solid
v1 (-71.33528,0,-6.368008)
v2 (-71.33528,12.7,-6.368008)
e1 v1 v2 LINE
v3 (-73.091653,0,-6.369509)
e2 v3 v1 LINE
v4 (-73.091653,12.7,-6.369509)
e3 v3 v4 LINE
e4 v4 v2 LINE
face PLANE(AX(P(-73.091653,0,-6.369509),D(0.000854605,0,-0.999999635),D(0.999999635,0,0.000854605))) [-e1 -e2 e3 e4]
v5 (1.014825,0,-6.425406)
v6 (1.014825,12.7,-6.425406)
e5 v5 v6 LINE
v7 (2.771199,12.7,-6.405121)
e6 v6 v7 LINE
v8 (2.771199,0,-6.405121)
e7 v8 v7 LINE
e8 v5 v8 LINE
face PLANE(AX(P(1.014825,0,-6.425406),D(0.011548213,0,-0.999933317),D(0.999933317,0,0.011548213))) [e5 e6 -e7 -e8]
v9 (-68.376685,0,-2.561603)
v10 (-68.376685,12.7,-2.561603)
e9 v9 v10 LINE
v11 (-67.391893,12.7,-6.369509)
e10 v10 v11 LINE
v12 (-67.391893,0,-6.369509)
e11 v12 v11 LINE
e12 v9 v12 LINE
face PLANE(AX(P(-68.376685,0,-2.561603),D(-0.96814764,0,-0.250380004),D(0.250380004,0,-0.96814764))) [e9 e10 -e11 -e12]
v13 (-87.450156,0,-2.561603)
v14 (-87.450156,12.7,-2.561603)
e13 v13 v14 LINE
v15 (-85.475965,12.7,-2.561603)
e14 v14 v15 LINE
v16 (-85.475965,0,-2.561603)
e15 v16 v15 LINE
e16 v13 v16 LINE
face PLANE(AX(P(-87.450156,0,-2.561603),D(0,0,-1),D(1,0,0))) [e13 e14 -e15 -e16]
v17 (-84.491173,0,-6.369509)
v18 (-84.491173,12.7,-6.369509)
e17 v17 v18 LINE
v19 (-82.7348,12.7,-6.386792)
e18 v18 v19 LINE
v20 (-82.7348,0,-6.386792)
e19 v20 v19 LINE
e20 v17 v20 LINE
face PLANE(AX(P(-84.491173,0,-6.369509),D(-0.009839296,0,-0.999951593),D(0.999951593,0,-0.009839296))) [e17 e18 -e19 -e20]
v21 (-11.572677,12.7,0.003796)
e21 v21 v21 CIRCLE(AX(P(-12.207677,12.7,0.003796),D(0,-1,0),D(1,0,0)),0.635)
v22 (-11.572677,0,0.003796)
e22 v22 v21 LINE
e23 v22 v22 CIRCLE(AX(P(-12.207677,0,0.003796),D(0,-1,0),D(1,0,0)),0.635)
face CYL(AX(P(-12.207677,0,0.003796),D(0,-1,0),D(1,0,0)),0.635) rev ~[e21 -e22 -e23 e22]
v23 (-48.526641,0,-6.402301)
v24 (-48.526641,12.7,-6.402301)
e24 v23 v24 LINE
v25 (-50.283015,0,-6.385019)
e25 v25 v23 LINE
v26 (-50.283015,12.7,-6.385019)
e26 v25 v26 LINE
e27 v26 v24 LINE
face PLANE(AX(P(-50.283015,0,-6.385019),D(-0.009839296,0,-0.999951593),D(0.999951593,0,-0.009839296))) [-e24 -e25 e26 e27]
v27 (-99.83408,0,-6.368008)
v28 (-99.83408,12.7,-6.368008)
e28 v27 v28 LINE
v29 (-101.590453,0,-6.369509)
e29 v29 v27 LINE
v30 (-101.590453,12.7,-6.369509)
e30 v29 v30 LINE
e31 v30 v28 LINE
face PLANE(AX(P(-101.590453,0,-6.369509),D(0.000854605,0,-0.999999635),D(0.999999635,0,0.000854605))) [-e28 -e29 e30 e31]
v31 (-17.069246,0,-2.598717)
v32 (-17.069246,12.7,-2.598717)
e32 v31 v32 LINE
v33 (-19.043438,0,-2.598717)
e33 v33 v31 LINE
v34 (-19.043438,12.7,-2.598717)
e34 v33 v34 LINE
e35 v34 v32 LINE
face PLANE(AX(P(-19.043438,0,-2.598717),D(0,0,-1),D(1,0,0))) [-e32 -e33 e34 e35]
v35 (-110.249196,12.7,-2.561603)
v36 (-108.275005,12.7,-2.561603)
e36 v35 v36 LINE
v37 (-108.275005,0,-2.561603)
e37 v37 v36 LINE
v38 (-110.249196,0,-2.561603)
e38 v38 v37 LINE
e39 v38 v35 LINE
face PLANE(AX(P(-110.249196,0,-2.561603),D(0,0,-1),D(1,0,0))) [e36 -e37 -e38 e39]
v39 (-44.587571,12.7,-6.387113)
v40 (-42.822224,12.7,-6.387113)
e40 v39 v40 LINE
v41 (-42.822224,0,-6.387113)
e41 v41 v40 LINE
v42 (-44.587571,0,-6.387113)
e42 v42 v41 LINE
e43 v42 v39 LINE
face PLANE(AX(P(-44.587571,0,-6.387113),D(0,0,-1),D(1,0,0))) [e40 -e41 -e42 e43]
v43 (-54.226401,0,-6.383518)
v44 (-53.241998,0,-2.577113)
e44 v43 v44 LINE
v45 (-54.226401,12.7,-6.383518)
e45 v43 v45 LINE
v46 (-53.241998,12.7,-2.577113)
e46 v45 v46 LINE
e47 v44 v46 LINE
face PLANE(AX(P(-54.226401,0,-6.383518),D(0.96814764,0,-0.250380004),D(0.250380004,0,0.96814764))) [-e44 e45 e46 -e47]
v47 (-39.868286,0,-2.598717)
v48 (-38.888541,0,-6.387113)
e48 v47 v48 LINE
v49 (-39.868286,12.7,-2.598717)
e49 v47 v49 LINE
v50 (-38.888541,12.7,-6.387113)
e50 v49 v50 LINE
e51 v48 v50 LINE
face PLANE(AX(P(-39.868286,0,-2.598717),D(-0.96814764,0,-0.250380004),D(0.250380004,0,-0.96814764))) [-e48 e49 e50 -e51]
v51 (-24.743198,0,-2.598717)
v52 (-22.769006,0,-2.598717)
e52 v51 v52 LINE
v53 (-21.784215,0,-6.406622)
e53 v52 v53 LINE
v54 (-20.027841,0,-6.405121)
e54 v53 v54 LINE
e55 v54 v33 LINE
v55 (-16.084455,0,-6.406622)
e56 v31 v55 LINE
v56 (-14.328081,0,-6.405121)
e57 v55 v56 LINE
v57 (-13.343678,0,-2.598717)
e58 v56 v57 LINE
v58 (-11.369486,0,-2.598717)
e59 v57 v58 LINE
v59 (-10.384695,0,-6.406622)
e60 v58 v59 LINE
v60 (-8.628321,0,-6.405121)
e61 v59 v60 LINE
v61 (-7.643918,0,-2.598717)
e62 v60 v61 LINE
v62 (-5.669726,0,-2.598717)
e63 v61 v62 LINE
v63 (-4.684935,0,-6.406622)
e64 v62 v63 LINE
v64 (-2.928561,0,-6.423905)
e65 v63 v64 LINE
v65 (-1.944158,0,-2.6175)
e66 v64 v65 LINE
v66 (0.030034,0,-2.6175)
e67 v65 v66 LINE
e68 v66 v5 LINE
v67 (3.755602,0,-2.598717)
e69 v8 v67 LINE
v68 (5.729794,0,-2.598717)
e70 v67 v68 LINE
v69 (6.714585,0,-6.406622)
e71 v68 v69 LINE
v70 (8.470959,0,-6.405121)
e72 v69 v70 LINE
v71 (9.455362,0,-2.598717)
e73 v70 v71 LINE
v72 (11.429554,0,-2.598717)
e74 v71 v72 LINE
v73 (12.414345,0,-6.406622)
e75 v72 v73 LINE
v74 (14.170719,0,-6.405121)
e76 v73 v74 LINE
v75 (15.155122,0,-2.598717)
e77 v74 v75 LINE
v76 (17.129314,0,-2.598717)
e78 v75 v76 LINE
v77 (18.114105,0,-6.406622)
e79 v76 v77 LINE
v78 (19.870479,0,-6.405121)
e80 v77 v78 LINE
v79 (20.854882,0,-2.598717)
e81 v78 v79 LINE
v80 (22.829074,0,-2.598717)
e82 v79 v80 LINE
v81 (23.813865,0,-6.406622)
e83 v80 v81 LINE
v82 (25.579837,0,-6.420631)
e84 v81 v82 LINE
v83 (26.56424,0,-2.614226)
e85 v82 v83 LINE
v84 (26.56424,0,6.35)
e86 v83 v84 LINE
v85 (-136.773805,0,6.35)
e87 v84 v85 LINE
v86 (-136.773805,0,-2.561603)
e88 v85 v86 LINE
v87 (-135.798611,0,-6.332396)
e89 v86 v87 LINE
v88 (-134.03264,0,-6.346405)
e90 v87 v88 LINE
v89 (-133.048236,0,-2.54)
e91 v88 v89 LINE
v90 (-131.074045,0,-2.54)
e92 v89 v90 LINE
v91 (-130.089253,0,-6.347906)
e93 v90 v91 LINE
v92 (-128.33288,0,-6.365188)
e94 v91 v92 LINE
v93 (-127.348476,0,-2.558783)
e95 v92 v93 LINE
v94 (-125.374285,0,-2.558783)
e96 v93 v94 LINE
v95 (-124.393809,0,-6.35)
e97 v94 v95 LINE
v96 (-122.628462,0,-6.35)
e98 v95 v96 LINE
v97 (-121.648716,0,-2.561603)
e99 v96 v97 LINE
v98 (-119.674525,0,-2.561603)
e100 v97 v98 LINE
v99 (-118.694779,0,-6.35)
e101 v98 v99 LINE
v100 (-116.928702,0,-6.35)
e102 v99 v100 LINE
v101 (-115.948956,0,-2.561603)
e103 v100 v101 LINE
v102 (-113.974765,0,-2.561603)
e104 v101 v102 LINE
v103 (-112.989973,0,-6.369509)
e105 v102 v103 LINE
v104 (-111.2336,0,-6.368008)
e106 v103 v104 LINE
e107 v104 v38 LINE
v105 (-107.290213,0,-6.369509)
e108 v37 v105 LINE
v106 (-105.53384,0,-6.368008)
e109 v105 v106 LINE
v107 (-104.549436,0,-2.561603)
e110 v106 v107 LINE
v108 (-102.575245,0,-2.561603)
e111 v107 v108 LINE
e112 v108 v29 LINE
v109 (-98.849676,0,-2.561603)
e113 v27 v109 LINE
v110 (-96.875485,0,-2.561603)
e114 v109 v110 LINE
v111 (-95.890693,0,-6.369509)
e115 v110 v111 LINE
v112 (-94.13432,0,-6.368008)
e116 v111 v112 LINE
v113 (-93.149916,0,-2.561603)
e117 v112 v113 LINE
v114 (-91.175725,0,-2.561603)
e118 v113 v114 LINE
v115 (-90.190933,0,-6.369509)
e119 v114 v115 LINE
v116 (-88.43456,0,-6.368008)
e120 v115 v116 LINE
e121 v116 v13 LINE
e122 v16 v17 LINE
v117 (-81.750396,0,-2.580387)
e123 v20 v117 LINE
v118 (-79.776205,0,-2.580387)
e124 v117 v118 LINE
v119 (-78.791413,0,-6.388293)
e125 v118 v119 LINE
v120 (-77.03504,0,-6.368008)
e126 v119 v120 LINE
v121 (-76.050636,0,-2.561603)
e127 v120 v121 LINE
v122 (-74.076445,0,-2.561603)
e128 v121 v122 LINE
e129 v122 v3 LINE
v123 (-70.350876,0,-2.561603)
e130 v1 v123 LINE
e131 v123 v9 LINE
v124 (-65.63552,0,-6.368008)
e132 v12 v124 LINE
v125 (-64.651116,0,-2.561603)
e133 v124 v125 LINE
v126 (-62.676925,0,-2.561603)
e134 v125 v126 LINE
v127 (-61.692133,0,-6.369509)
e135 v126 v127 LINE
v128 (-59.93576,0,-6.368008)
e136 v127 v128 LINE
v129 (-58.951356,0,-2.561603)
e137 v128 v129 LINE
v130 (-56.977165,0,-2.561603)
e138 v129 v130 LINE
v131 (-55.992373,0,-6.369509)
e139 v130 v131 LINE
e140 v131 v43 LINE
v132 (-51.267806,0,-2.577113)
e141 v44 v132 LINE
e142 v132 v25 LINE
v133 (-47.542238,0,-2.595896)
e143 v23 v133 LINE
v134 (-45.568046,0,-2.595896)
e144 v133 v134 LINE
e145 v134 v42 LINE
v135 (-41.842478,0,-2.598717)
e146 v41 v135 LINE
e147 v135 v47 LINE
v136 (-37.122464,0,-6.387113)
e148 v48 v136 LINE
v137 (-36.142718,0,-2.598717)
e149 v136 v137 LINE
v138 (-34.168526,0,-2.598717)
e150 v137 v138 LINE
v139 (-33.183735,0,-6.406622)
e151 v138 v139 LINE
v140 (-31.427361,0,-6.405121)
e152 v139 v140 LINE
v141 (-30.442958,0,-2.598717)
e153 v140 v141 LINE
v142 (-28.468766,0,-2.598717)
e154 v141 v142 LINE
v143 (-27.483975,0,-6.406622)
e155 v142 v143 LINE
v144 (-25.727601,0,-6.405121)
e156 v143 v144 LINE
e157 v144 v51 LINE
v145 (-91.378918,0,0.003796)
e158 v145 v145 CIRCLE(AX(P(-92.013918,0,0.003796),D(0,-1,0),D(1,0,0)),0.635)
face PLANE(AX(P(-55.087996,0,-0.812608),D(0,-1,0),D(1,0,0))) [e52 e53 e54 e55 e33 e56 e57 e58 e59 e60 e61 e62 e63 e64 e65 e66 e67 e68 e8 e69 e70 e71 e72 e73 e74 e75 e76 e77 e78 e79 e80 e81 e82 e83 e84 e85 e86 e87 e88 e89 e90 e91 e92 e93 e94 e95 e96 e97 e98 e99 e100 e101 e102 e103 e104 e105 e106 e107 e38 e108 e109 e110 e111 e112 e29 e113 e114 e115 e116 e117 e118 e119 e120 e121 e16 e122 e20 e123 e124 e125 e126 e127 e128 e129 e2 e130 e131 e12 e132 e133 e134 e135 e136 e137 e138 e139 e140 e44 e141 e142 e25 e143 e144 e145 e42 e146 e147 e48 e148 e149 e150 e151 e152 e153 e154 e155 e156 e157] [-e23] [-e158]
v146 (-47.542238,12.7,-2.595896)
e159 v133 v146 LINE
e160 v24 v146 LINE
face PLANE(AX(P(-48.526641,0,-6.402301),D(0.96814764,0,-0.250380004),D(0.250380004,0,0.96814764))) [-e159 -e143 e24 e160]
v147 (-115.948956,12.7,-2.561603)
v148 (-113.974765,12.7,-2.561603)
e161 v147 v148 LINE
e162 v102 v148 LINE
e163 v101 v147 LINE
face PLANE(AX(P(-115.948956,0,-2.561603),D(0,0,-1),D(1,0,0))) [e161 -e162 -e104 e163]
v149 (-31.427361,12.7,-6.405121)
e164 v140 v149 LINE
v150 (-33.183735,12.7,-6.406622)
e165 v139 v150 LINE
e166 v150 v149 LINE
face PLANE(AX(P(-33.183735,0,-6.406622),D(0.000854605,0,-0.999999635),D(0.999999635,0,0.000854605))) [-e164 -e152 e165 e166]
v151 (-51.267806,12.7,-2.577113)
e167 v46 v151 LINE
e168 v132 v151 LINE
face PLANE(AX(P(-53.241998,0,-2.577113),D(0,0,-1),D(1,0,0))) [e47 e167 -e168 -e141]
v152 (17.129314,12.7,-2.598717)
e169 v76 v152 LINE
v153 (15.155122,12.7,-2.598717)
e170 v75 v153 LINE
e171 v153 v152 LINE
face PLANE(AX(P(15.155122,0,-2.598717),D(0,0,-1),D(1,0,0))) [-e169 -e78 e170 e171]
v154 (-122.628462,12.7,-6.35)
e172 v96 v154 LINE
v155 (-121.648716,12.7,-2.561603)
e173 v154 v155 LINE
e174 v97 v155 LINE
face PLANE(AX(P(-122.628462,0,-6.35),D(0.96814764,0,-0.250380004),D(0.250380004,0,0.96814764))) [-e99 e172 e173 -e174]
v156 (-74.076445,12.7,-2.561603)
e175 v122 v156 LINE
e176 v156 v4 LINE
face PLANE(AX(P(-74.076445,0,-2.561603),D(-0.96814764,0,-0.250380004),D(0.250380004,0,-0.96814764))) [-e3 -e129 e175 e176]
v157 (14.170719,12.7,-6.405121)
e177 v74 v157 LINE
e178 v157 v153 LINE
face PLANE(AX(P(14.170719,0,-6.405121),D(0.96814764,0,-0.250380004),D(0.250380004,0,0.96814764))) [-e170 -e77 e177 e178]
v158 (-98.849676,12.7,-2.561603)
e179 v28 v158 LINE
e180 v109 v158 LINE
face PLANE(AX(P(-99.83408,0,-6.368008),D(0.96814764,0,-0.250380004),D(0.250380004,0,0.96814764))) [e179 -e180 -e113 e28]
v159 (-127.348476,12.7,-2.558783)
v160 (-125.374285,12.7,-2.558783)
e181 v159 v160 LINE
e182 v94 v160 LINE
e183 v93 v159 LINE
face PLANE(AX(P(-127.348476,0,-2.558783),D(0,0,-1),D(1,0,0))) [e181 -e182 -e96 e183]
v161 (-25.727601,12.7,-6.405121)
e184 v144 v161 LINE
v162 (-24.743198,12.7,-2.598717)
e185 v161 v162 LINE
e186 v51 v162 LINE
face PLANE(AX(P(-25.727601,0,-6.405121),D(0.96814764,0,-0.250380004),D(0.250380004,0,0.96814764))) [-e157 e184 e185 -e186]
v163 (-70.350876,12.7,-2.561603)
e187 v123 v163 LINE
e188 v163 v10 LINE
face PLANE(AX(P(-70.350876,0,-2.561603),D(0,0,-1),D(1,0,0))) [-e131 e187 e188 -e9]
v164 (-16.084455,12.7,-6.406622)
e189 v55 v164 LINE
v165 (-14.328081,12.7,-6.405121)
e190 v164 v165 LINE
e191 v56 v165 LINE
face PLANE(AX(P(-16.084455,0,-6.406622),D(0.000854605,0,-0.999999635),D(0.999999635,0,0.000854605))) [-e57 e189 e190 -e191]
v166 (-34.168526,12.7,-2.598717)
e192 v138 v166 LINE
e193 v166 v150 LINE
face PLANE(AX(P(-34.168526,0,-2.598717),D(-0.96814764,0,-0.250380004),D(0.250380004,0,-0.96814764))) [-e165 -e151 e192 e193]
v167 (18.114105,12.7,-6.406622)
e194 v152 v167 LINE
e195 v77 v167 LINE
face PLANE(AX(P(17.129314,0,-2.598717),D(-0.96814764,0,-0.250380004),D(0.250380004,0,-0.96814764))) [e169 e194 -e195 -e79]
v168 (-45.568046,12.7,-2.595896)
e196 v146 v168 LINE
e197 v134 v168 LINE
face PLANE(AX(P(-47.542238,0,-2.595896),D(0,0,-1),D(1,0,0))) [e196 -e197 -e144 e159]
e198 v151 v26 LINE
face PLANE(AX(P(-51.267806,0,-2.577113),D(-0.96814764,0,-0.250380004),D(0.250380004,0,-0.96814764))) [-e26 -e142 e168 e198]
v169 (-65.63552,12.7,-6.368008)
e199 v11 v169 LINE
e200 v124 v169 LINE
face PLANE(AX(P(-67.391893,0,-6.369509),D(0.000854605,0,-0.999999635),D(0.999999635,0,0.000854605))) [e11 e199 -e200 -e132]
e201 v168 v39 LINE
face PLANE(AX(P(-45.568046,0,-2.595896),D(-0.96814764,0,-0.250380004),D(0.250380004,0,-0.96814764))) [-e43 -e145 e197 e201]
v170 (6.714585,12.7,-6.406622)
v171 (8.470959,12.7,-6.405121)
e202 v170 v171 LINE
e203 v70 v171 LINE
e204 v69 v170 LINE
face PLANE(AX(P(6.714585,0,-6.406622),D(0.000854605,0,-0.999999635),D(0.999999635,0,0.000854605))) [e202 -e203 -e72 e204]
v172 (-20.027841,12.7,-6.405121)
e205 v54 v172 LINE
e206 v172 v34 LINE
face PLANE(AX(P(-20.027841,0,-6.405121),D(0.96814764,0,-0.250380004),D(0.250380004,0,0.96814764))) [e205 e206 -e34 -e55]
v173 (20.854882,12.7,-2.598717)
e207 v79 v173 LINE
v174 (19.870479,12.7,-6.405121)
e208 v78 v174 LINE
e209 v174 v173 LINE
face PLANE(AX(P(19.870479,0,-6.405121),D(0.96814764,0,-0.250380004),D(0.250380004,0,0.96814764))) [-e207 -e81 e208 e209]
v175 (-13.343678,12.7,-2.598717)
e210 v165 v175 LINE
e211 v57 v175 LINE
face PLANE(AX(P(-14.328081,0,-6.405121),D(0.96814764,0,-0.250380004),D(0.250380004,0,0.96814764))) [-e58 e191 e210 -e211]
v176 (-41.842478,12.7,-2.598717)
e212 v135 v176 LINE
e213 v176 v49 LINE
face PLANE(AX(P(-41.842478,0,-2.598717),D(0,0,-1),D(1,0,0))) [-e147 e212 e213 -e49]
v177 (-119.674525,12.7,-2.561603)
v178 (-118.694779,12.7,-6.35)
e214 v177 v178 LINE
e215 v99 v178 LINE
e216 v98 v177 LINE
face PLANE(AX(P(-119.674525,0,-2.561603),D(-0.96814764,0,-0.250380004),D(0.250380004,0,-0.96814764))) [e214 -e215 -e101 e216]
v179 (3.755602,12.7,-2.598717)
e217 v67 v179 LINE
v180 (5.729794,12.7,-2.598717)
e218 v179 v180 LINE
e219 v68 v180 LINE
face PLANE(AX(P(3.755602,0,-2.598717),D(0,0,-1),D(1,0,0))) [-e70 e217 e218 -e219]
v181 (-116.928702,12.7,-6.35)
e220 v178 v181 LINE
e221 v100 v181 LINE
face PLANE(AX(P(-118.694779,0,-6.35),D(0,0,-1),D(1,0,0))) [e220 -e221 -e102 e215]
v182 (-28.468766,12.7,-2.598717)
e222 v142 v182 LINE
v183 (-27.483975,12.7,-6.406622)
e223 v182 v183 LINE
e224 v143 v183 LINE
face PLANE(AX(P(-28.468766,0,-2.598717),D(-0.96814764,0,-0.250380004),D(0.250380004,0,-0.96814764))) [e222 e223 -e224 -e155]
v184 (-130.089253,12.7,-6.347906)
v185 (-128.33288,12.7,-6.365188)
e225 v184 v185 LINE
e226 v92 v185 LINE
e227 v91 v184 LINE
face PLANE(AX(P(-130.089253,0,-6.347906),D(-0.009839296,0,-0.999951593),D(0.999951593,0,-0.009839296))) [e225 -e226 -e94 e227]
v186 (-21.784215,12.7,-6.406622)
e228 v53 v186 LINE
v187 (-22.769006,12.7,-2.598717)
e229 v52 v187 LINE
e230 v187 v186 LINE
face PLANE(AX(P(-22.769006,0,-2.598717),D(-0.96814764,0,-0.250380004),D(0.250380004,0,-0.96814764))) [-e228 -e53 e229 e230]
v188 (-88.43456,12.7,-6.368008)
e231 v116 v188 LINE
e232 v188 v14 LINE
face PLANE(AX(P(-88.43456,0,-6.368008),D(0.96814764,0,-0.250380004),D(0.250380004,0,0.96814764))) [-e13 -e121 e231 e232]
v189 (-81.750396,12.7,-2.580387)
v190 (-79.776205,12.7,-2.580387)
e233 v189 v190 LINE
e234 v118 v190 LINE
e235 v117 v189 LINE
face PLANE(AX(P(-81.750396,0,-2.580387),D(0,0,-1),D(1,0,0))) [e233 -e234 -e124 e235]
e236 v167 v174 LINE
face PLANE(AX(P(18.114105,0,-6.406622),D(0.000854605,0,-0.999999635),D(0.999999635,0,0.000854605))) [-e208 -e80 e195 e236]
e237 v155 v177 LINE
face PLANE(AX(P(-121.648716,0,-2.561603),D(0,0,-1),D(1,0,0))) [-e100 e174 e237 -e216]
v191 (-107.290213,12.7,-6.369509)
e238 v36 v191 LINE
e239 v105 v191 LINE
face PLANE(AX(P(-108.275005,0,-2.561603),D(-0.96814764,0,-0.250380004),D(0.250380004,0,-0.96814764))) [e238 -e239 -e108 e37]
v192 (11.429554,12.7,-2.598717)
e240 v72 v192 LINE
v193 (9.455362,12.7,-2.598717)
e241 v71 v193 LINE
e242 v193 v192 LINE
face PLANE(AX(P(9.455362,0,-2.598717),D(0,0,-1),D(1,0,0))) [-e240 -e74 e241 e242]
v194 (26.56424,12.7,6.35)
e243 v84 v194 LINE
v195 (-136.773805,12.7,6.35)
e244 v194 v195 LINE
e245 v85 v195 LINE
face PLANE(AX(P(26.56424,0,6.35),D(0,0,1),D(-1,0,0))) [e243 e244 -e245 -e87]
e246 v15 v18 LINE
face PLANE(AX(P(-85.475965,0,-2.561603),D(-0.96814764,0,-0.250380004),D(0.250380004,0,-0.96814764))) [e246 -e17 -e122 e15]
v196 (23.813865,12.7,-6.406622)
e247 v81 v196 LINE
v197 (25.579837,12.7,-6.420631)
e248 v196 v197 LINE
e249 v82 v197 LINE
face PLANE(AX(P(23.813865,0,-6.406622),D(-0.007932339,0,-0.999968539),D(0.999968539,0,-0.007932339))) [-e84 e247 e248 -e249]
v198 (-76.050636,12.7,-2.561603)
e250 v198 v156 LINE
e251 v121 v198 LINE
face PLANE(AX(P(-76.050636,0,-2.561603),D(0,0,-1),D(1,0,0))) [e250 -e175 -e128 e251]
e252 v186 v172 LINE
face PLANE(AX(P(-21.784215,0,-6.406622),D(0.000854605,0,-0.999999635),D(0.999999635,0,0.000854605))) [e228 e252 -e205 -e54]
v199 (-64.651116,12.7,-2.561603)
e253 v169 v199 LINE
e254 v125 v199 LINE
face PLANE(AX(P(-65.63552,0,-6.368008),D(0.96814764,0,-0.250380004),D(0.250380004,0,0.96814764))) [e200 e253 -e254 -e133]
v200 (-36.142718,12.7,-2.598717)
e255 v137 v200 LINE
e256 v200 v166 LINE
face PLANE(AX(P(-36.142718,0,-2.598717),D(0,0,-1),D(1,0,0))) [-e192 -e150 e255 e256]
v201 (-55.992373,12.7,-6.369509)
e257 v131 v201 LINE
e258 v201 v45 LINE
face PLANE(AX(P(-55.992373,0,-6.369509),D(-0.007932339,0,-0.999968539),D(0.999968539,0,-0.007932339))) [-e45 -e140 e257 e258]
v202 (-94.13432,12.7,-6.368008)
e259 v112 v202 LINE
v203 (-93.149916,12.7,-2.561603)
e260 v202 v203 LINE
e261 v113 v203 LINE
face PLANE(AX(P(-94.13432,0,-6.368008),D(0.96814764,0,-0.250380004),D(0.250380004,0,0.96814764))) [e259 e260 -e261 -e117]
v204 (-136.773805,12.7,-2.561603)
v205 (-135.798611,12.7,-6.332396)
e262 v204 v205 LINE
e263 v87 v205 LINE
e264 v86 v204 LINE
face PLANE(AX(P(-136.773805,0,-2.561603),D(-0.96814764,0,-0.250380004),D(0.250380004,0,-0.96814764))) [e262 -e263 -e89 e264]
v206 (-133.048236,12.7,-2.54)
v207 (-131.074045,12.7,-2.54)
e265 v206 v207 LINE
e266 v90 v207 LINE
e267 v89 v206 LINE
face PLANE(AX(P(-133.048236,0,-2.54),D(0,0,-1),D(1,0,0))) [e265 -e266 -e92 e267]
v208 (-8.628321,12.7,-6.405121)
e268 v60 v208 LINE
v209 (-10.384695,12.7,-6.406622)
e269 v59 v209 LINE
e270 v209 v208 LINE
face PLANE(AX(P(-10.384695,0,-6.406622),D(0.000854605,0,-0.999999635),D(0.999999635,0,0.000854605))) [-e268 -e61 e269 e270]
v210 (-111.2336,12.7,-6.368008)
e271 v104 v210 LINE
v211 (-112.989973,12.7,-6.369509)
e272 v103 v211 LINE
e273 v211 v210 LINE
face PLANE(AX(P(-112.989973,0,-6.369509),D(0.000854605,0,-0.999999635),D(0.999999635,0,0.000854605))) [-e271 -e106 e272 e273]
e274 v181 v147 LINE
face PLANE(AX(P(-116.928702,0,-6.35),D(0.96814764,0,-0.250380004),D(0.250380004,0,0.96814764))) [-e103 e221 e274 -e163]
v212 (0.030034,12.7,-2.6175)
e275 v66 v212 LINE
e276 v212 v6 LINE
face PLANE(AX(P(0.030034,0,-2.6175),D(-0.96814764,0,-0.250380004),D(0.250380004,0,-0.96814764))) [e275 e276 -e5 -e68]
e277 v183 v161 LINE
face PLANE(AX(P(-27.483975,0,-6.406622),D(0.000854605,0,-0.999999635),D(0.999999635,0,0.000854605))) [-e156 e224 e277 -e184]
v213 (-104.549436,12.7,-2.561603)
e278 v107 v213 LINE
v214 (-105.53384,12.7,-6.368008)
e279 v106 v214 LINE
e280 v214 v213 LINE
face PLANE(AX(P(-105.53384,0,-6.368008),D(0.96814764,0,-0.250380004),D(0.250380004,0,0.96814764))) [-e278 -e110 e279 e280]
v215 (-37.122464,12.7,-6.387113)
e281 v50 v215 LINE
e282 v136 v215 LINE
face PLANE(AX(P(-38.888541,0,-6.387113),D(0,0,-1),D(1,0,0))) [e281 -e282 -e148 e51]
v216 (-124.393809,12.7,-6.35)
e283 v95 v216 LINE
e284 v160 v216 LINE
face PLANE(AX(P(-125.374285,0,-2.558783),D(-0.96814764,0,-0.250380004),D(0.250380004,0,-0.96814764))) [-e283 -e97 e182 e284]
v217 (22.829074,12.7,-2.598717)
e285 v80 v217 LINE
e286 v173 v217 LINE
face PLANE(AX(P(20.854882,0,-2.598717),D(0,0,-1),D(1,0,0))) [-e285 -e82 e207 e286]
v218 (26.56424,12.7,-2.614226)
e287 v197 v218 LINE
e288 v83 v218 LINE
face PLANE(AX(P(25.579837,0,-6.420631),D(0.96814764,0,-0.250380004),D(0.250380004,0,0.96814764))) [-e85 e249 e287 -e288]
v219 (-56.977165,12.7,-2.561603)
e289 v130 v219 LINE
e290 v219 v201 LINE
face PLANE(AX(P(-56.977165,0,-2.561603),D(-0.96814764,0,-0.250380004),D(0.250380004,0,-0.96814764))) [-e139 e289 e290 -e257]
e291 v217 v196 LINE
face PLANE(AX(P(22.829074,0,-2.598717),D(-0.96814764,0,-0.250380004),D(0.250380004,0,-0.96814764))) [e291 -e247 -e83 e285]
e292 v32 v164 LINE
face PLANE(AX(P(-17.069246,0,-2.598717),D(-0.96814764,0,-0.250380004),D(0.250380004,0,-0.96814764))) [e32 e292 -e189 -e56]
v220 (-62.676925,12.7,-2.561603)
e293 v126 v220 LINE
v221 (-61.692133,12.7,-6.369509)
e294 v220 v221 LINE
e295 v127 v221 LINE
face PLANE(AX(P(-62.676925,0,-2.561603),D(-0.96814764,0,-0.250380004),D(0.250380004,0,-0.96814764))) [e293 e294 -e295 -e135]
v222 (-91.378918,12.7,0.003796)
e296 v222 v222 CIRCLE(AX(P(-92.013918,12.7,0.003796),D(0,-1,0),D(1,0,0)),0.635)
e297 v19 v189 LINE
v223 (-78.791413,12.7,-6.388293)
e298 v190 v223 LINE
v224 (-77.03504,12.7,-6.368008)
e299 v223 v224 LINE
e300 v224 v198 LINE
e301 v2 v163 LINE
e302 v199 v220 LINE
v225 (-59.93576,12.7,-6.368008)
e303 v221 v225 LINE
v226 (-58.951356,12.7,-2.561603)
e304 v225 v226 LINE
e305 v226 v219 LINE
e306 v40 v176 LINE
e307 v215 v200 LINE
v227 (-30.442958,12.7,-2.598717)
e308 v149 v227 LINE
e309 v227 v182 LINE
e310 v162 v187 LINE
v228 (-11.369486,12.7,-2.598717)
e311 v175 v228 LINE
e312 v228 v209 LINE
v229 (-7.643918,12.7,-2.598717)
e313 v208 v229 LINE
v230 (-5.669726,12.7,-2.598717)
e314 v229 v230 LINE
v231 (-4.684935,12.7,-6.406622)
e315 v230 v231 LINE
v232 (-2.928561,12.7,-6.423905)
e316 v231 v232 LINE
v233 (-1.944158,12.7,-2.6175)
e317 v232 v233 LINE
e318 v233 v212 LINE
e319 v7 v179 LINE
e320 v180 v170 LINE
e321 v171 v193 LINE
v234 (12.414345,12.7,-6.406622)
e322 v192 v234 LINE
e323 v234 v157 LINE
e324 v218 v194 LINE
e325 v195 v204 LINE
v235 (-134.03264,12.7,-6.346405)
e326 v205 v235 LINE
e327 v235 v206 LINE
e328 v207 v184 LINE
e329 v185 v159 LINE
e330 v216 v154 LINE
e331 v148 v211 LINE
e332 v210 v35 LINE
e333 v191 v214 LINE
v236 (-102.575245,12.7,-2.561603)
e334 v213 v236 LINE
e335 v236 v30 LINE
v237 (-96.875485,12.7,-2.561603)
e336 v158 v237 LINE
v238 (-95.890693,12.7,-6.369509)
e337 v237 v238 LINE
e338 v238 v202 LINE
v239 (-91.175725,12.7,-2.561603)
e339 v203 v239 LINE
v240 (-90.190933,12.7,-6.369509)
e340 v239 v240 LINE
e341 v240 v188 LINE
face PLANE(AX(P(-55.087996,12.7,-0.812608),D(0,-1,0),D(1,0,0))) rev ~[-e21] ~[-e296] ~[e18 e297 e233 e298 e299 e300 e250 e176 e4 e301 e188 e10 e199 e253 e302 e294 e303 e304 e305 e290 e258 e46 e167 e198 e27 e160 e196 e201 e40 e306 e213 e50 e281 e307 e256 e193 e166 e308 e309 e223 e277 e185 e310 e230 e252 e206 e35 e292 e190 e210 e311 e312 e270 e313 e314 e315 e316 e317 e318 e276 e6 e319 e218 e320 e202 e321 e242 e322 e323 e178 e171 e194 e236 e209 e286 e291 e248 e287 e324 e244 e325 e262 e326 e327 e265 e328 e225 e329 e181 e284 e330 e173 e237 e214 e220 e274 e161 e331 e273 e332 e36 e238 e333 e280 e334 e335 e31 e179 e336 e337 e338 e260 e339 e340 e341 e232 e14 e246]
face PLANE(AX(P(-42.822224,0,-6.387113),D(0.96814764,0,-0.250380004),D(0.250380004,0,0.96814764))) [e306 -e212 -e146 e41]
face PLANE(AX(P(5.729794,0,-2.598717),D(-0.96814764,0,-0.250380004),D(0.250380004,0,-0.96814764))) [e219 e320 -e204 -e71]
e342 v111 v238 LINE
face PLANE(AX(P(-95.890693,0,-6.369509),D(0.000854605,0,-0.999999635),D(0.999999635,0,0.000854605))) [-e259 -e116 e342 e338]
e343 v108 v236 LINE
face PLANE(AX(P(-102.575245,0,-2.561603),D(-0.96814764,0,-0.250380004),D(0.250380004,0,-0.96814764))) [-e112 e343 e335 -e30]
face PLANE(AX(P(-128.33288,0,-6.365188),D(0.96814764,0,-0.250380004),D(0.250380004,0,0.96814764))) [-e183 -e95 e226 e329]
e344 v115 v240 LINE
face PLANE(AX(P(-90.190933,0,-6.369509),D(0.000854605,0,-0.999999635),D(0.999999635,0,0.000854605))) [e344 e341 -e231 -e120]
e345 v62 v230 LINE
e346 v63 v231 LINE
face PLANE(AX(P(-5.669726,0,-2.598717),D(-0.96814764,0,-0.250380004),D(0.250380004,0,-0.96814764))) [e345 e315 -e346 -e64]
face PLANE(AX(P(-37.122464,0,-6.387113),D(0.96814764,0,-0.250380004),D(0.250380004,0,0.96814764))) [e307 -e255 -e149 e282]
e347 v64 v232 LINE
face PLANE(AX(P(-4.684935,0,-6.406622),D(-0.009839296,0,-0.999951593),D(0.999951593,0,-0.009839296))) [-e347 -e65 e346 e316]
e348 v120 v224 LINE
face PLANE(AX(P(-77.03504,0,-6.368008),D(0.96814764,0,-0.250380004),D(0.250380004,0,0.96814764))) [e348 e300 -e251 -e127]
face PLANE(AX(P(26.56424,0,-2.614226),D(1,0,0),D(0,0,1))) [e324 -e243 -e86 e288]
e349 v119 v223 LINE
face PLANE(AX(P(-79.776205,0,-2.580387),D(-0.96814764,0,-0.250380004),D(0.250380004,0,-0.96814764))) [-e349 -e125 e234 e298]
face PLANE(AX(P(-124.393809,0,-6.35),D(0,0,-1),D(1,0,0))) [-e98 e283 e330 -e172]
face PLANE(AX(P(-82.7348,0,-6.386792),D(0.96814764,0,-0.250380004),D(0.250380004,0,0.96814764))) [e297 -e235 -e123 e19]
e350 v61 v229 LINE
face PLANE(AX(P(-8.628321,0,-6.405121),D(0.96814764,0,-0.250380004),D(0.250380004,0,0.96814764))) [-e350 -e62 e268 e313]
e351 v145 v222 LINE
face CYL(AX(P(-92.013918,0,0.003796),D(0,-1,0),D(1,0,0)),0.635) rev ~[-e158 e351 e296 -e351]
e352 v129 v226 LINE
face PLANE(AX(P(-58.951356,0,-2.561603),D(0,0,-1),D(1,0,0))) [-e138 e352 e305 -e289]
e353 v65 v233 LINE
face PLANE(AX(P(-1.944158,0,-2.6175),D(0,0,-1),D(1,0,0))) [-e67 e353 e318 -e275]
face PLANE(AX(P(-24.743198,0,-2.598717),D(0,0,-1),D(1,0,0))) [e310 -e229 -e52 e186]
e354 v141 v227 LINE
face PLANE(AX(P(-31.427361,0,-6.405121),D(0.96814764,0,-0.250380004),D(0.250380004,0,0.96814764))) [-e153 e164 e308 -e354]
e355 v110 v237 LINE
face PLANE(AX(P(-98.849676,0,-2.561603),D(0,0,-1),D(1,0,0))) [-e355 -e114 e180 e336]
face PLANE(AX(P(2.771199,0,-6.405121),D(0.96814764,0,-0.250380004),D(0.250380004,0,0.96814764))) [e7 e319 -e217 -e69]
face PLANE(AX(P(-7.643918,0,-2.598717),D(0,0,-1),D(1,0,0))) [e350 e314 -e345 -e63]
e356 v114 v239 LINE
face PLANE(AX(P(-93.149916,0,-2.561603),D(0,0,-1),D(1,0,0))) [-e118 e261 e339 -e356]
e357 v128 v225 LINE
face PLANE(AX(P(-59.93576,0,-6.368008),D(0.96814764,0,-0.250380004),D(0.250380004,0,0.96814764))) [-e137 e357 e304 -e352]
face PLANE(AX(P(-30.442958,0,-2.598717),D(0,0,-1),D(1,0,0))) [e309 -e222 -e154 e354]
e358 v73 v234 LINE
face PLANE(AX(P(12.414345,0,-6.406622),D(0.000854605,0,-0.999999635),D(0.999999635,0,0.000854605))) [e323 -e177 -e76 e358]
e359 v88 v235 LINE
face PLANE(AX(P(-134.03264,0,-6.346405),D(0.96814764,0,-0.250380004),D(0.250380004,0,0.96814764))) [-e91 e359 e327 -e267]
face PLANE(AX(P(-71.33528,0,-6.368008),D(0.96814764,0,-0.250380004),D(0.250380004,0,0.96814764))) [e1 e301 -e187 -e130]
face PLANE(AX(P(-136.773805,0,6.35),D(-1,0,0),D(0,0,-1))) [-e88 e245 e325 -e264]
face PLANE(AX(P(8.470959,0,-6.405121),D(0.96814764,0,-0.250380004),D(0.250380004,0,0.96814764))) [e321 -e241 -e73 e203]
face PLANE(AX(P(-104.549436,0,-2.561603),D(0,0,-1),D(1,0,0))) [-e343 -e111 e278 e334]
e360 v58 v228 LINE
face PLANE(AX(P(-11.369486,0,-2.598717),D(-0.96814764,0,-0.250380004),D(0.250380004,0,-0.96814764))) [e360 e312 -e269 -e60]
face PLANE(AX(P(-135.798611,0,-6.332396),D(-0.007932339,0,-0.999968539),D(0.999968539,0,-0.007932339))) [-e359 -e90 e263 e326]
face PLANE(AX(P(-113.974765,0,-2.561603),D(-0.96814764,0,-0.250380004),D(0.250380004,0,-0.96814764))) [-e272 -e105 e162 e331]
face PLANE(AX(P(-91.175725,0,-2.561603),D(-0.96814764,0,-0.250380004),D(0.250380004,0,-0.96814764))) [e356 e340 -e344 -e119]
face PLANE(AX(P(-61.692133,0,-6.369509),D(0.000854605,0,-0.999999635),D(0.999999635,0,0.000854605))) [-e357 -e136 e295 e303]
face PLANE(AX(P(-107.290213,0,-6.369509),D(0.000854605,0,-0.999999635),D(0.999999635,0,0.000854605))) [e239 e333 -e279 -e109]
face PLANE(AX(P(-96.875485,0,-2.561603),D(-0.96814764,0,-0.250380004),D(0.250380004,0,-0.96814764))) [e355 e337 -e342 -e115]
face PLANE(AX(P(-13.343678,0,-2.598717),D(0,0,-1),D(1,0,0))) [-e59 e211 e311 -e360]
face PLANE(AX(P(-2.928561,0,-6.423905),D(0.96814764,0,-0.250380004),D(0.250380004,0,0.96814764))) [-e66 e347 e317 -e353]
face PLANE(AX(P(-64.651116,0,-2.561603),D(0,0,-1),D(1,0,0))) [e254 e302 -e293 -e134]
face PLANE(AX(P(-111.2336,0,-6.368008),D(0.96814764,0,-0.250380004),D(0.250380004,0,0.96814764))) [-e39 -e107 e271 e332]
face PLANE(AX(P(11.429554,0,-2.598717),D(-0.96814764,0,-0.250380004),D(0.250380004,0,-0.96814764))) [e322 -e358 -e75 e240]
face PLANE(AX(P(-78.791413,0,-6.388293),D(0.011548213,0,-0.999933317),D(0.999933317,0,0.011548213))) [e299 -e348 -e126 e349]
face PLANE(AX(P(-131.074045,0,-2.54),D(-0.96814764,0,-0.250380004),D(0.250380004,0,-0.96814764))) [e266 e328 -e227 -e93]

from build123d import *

# Parameters (mm, degrees)
F0_R     = 0.635
F1_DEPTH = 12.7


# Not quite as in the source:
# - a feature of the source that left no trace in its solid (it failed there, or was rolled back) is left out


with BuildPart() as f1:
    # F0 (on Front) → F1 (new body)
    with BuildSketch(Plane.XZ):
        Polygon((26.5642398671, -2.6142263417), (26.5642398671, 6.35), (-136.7738045981, 6.35), (-136.7738045981, -2.5616034378), (-135.7986113058, -6.3323961114), (-134.0326395944, -6.346404838), (-133.0482363701, -2.54), (-131.0740445981, -2.54), (-130.0892531872, -6.3479058444), (-128.3328795944, -6.3651881602), (-127.3484763701, -2.5587833222), (-125.3742845981, -2.5587833222), (-124.3938092991, -6.35), (-122.6284623376, -6.35), (-121.6487163701, -2.5616034378), (-119.6745245981, -2.5616034378), (-118.6947786306, -6.35), (-116.9287023376, -6.35), (-115.9489563701, -2.5616034378), (-113.9747645981, -2.5616034378), (-112.9899731872, -6.3695092822), (-111.2335995944, -6.3680082758), (-110.2491963701, -2.5616034378), (-108.2750045981, -2.5616034378), (-107.2902131872, -6.3695092822), (-105.5338395944, -6.3680082758), (-104.5494363701, -2.5616034378), (-102.5752445981, -2.5616034378), (-101.5904531872, -6.3695092822), (-99.8340795944, -6.3680082758), (-98.8496763701, -2.5616034378), (-96.8754845981, -2.5616034378), (-95.8906931872, -6.3695092822), (-94.1343195944, -6.3680082758), (-93.1499163701, -2.5616034378), (-91.1757245981, -2.5616034378), (-90.1909331872, -6.3695092822), (-88.4345595944, -6.3680082758), (-87.4501563701, -2.5616034378), (-85.4759645981, -2.5616034378), (-84.4911731872, -6.3695092822), (-82.7347995944, -6.386791598), (-81.7503963701, -2.58038676), (-79.7762045981, -2.58038676), (-78.7914131872, -6.3882926044), (-77.0350395944, -6.3680082758), (-76.0506363701, -2.5616034378), (-74.0764445981, -2.5616034378), (-73.0916531872, -6.3695092822), (-71.3352795944, -6.3680082758), (-70.3508763701, -2.5616034378), (-68.3766845981, -2.5616034378), (-67.3918931872, -6.3695092822), (-65.6355195944, -6.3680082758), (-64.6511163701, -2.5616034378), (-62.6769245981, -2.5616034378), (-61.6921331872, -6.3695092822), (-59.9357595944, -6.3680082758), (-58.9513563701, -2.5616034378), (-56.9771645981, -2.5616034378), (-55.9923731872, -6.3695092822), (-54.2264014758, -6.3835180088), (-53.2419982515, -2.5771131708), (-51.2678064795, -2.5771131708), (-50.2830150686, -6.3850190153), (-48.5266414758, -6.402301331), (-47.5422382515, -2.595896493), (-45.5680464795, -2.595896493), (-44.5875711805, -6.3871131708), (-42.822224219, -6.3871131708), (-41.8424782515, -2.5987166086), (-39.8682864795, -2.5987166086), (-38.888540512, -6.3871131708), (-37.122464219, -6.3871131708), (-36.1427182515, -2.5987166086), (-34.1685264795, -2.5987166086), (-33.1837350686, -6.4066224531), (-31.4273614758, -6.4051214466), (-30.4429582515, -2.5987166086), (-28.4687664795, -2.5987166086), (-27.4839750686, -6.4066224531), (-25.7276014758, -6.4051214466), (-24.7431982515, -2.5987166086), (-22.7690064795, -2.5987166086), (-21.7842150686, -6.4066224531), (-20.0278414758, -6.4051214466), (-19.0434382515, -2.5987166086), (-17.0692464795, -2.5987166086), (-16.0844550686, -6.4066224531), (-14.3280814758, -6.4051214466), (-13.3436782515, -2.5987166086), (-11.3694864795, -2.5987166086), (-10.3846950686, -6.4066224531), (-8.6283214758, -6.4051214466), (-7.6439182515, -2.5987166086), (-5.6697264795, -2.5987166086), (-4.6849350686, -6.4066224531), (-2.9285614758, -6.4239047688), (-1.9441582515, -2.6174999308), (0.0300335205, -2.6174999308), (1.0148249314, -6.4254057753), (2.7711985242, -6.4051214466), (3.7556017485, -2.5987166086), (5.7297935205, -2.5987166086), (6.7145849314, -6.4066224531), (8.4709585242, -6.4051214466), (9.4553617485, -2.5987166086), (11.4295535205, -2.5987166086), (12.4143449314, -6.4066224531), (14.1707185242, -6.4051214466), (15.1551217485, -2.5987166086), (17.1293135205, -2.5987166086), (18.1141049314, -6.4066224531), (19.8704785242, -6.4051214466), (20.8548817485, -2.5987166086), (22.8290735205, -2.5987166086), (23.8138649314, -6.4066224531), (25.5798366429, -6.4206311797), align=None)
        with Locations((-92.0139178634, 0.0037964069)):
            Circle(F0_R, mode=Mode.SUBTRACT)
        with Locations((-12.2076766565, 0.0037964069)):
            Circle(F0_R, mode=Mode.SUBTRACT)
    extrude(amount=-F1_DEPTH)


solid = f1.part
